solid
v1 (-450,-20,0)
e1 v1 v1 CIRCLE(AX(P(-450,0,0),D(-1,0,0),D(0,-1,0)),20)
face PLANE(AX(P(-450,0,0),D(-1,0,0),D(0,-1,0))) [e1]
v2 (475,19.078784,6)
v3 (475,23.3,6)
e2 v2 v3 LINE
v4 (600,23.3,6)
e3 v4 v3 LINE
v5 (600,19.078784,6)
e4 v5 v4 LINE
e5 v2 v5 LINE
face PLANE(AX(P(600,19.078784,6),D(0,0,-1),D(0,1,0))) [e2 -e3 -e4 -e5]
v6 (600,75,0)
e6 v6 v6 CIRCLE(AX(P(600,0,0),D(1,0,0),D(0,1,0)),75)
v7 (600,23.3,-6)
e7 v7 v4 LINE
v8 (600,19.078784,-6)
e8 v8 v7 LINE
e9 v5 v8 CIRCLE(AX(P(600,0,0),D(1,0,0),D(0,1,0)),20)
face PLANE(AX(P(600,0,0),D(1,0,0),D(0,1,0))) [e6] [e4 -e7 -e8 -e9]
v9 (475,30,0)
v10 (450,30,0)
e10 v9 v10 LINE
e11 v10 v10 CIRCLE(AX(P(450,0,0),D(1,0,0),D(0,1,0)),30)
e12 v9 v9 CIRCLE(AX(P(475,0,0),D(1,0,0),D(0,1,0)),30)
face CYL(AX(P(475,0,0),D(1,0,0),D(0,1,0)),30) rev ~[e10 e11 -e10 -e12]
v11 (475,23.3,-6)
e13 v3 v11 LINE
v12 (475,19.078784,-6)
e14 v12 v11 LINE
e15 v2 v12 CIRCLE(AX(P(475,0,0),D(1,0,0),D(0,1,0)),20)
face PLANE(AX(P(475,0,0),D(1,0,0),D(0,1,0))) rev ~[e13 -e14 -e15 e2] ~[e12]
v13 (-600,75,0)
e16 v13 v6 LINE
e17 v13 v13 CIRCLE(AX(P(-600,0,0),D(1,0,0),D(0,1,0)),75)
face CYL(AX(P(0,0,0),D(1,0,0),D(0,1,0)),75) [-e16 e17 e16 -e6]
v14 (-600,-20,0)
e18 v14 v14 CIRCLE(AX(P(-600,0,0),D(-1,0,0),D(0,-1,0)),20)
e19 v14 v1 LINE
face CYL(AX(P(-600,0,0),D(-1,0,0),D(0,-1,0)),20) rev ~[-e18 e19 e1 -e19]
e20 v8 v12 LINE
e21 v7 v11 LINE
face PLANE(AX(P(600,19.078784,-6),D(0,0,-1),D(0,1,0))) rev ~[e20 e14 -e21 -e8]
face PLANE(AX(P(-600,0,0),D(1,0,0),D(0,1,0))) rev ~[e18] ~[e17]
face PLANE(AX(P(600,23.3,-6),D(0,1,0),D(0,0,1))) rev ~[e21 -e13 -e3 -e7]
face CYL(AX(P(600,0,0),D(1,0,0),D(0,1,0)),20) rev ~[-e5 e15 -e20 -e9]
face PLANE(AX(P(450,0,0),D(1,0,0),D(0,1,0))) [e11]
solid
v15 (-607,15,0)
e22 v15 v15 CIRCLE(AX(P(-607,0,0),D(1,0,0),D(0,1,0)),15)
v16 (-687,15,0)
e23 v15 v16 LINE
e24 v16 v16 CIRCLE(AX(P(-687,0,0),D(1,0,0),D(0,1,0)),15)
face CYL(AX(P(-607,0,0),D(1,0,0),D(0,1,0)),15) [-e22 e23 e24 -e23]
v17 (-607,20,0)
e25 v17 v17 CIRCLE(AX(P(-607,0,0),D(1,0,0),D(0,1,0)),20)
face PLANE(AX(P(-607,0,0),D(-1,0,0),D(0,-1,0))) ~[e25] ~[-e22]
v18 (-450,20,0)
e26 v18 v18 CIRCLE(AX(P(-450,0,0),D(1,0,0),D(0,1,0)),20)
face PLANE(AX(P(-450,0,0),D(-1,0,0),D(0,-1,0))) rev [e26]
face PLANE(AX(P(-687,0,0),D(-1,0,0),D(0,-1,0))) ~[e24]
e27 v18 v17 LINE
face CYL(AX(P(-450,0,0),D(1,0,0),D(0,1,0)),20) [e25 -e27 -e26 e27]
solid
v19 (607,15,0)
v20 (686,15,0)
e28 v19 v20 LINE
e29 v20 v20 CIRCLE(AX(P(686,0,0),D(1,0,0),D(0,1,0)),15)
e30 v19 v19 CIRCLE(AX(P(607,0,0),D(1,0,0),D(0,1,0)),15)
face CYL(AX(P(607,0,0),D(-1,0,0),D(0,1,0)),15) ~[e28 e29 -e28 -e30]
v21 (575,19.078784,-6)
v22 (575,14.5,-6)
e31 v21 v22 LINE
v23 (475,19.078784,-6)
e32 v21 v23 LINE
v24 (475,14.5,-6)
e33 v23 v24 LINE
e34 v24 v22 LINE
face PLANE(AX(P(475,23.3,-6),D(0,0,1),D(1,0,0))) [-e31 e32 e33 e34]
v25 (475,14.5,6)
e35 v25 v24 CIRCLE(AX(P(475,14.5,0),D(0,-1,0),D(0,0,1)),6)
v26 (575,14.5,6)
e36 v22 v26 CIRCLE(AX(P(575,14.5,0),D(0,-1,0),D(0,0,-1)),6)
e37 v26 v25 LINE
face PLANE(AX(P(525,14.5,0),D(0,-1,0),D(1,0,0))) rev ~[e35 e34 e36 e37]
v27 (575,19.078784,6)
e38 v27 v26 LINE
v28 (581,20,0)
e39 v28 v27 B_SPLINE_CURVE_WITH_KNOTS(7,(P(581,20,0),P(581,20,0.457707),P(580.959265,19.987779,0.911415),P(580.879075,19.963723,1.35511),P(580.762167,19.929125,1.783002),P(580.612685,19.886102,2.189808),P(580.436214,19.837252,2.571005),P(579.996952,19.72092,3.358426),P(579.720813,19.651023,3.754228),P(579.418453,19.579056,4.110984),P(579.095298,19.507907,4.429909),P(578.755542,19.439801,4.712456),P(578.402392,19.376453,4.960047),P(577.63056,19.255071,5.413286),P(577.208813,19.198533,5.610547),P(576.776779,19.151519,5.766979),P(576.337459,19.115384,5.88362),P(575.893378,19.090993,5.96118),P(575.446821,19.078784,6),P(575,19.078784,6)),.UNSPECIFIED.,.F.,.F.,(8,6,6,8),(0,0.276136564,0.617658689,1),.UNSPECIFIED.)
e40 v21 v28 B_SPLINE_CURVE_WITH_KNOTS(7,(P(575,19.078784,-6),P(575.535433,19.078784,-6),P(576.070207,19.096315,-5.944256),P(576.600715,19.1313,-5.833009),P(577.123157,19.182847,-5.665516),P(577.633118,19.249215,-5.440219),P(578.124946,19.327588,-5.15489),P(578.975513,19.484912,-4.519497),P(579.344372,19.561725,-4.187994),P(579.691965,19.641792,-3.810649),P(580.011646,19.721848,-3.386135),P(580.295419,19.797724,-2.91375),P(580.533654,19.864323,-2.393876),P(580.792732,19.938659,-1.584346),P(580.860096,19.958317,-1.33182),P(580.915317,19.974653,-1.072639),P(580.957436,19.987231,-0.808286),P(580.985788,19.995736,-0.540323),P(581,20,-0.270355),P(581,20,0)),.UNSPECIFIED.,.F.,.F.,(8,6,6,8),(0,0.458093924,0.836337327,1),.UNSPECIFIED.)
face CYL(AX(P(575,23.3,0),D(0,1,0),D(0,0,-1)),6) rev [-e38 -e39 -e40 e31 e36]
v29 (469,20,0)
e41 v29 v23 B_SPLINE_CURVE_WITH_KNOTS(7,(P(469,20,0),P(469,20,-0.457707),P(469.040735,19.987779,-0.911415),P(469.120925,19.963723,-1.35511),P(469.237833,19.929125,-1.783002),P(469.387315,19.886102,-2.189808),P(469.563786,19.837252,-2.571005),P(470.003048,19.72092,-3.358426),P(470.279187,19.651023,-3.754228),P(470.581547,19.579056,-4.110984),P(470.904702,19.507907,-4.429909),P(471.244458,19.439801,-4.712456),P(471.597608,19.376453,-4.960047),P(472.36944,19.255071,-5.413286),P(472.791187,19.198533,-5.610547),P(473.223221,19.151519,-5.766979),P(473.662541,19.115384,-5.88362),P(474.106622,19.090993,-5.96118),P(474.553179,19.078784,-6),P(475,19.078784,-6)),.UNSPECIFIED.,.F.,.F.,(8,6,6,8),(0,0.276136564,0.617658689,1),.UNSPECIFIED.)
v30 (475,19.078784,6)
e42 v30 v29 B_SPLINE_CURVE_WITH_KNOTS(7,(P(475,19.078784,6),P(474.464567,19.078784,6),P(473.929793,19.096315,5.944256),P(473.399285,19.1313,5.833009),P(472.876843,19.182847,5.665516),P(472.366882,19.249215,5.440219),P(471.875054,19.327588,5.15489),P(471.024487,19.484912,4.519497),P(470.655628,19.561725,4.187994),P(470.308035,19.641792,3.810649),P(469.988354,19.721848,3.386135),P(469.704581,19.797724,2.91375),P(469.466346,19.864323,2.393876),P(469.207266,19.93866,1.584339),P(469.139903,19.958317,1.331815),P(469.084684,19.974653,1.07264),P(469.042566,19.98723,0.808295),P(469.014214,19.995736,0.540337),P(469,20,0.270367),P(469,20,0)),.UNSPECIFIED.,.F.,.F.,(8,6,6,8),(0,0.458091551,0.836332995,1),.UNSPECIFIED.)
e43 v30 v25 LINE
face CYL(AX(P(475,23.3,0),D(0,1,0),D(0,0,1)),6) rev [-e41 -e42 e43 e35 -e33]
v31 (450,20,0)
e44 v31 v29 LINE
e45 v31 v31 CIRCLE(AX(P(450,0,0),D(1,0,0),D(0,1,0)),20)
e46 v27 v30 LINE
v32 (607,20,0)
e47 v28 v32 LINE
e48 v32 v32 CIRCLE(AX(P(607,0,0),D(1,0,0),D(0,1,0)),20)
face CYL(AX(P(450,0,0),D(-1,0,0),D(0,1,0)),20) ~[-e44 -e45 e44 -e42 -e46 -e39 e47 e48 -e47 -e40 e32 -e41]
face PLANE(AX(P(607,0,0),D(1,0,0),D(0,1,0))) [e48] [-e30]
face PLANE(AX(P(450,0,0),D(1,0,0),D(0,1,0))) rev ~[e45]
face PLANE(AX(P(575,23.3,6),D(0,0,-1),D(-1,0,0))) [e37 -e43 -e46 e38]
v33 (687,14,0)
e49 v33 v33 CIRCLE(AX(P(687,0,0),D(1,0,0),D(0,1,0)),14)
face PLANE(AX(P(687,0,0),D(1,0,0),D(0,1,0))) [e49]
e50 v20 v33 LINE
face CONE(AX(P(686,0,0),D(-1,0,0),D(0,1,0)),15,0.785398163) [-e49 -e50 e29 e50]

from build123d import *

# Parameters (mm, degrees)
F0_R      = 75
F1_DEPTH  = 600
F2_R      = 20
F3_DEPTH  = 150
F4_R      = 20
F5_DEPTH  = 150
F6_W      = 4.2212159717
F6_H      = 12
F7_DEPTH  = 125
F8_R      = 20
F9_DEPTH  = 157
F10_R     = 15
F11_DEPTH = 80
F14_DEPTH = 8.8
F16_R     = 30
F17_DEPTH = 25
F18_DEPTH = 92
F19_SIZE  = 1


with BuildPart() as f1:
    # F0 (on Right) → F1 (new body, symmetric)
    with BuildSketch(Plane.YZ):
        Circle(F0_R)
    extrude(amount=F1_DEPTH, both=True)

    # F2 (on face) → F3 (cut)
    with BuildSketch(Plane.YZ.offset(600)):
        Circle(F2_R)
    extrude(amount=-F3_DEPTH, mode=Mode.SUBTRACT)

    # F4 (on face) → F5 (cut)
    with BuildSketch(Plane(origin=(-600, 0, 0), x_dir=(0, -1, 0), z_dir=(-1, 0, 0))):
        Circle(F4_R)
    extrude(amount=-F5_DEPTH, mode=Mode.SUBTRACT)

    # F6 (on face) → F7 (cut)
    with BuildSketch(Plane.YZ.offset(600)):
        with Locations((21.1893920142, 0)):
            Rectangle(F6_W, F6_H)
    extrude(amount=-F7_DEPTH, mode=Mode.SUBTRACT)


with BuildPart() as f9:
    # F8 (on face) → F9 (new body)
    with BuildSketch(Plane.YZ.offset(450)):
        Circle(F8_R)
    extrude(amount=F9_DEPTH)

    # F10 (on face) → F11 (join)
    with BuildSketch(Plane.YZ.offset(607)):
        Circle(F10_R)
    extrude(amount=F11_DEPTH)


with BuildPart() as f12_1:
    # F12: instance of F9
    add(f9.part.mirror(Plane.YZ))

    # F18 (add): a face of the model
    f18_faces = [f12_1.faces().sort_by_distance(p)[0] for p in [
        (-687, 0, 0),
    ]]
    extrude(f18_faces, amount=-F18_DEPTH)


with BuildPart() as f14_tool:
    # F13 (on face) → F14 (new body)
    with BuildSketch(Plane.XZ.offset(-23.3)):
        with BuildLine():
            ThreePointArc((475, 6), (469, 0), (475, -6))
            Line((475, -6), (575, -6))
            ThreePointArc((575, -6), (581, 0), (575, 6))
            Line((575, 6), (475, 6))
        make_face()
    extrude(amount=F14_DEPTH)


with BuildPart() as f1_1:
    add(f1.part)

    # F14: cut by f14_tool
    add(f14_tool.part, mode=Mode.SUBTRACT)

    # F16 (on offset) → F17 (cut)
    with BuildSketch(Plane.YZ.offset(475)):
        Circle(F16_R)
    extrude(amount=-F17_DEPTH, mode=Mode.SUBTRACT)


with BuildPart() as f9_1:
    add(f9.part)

    # F14: cut by f14_tool
    add(f14_tool.part, mode=Mode.SUBTRACT)

    # F19
    f19_edges = [f9_1.edges().sort_by_distance(p)[0] for p in [
        (687, -15, 0),
    ]]
    chamfer(f19_edges, length=F19_SIZE)


solid = Compound([f12_1.part, f1_1.part, f9_1.part])
